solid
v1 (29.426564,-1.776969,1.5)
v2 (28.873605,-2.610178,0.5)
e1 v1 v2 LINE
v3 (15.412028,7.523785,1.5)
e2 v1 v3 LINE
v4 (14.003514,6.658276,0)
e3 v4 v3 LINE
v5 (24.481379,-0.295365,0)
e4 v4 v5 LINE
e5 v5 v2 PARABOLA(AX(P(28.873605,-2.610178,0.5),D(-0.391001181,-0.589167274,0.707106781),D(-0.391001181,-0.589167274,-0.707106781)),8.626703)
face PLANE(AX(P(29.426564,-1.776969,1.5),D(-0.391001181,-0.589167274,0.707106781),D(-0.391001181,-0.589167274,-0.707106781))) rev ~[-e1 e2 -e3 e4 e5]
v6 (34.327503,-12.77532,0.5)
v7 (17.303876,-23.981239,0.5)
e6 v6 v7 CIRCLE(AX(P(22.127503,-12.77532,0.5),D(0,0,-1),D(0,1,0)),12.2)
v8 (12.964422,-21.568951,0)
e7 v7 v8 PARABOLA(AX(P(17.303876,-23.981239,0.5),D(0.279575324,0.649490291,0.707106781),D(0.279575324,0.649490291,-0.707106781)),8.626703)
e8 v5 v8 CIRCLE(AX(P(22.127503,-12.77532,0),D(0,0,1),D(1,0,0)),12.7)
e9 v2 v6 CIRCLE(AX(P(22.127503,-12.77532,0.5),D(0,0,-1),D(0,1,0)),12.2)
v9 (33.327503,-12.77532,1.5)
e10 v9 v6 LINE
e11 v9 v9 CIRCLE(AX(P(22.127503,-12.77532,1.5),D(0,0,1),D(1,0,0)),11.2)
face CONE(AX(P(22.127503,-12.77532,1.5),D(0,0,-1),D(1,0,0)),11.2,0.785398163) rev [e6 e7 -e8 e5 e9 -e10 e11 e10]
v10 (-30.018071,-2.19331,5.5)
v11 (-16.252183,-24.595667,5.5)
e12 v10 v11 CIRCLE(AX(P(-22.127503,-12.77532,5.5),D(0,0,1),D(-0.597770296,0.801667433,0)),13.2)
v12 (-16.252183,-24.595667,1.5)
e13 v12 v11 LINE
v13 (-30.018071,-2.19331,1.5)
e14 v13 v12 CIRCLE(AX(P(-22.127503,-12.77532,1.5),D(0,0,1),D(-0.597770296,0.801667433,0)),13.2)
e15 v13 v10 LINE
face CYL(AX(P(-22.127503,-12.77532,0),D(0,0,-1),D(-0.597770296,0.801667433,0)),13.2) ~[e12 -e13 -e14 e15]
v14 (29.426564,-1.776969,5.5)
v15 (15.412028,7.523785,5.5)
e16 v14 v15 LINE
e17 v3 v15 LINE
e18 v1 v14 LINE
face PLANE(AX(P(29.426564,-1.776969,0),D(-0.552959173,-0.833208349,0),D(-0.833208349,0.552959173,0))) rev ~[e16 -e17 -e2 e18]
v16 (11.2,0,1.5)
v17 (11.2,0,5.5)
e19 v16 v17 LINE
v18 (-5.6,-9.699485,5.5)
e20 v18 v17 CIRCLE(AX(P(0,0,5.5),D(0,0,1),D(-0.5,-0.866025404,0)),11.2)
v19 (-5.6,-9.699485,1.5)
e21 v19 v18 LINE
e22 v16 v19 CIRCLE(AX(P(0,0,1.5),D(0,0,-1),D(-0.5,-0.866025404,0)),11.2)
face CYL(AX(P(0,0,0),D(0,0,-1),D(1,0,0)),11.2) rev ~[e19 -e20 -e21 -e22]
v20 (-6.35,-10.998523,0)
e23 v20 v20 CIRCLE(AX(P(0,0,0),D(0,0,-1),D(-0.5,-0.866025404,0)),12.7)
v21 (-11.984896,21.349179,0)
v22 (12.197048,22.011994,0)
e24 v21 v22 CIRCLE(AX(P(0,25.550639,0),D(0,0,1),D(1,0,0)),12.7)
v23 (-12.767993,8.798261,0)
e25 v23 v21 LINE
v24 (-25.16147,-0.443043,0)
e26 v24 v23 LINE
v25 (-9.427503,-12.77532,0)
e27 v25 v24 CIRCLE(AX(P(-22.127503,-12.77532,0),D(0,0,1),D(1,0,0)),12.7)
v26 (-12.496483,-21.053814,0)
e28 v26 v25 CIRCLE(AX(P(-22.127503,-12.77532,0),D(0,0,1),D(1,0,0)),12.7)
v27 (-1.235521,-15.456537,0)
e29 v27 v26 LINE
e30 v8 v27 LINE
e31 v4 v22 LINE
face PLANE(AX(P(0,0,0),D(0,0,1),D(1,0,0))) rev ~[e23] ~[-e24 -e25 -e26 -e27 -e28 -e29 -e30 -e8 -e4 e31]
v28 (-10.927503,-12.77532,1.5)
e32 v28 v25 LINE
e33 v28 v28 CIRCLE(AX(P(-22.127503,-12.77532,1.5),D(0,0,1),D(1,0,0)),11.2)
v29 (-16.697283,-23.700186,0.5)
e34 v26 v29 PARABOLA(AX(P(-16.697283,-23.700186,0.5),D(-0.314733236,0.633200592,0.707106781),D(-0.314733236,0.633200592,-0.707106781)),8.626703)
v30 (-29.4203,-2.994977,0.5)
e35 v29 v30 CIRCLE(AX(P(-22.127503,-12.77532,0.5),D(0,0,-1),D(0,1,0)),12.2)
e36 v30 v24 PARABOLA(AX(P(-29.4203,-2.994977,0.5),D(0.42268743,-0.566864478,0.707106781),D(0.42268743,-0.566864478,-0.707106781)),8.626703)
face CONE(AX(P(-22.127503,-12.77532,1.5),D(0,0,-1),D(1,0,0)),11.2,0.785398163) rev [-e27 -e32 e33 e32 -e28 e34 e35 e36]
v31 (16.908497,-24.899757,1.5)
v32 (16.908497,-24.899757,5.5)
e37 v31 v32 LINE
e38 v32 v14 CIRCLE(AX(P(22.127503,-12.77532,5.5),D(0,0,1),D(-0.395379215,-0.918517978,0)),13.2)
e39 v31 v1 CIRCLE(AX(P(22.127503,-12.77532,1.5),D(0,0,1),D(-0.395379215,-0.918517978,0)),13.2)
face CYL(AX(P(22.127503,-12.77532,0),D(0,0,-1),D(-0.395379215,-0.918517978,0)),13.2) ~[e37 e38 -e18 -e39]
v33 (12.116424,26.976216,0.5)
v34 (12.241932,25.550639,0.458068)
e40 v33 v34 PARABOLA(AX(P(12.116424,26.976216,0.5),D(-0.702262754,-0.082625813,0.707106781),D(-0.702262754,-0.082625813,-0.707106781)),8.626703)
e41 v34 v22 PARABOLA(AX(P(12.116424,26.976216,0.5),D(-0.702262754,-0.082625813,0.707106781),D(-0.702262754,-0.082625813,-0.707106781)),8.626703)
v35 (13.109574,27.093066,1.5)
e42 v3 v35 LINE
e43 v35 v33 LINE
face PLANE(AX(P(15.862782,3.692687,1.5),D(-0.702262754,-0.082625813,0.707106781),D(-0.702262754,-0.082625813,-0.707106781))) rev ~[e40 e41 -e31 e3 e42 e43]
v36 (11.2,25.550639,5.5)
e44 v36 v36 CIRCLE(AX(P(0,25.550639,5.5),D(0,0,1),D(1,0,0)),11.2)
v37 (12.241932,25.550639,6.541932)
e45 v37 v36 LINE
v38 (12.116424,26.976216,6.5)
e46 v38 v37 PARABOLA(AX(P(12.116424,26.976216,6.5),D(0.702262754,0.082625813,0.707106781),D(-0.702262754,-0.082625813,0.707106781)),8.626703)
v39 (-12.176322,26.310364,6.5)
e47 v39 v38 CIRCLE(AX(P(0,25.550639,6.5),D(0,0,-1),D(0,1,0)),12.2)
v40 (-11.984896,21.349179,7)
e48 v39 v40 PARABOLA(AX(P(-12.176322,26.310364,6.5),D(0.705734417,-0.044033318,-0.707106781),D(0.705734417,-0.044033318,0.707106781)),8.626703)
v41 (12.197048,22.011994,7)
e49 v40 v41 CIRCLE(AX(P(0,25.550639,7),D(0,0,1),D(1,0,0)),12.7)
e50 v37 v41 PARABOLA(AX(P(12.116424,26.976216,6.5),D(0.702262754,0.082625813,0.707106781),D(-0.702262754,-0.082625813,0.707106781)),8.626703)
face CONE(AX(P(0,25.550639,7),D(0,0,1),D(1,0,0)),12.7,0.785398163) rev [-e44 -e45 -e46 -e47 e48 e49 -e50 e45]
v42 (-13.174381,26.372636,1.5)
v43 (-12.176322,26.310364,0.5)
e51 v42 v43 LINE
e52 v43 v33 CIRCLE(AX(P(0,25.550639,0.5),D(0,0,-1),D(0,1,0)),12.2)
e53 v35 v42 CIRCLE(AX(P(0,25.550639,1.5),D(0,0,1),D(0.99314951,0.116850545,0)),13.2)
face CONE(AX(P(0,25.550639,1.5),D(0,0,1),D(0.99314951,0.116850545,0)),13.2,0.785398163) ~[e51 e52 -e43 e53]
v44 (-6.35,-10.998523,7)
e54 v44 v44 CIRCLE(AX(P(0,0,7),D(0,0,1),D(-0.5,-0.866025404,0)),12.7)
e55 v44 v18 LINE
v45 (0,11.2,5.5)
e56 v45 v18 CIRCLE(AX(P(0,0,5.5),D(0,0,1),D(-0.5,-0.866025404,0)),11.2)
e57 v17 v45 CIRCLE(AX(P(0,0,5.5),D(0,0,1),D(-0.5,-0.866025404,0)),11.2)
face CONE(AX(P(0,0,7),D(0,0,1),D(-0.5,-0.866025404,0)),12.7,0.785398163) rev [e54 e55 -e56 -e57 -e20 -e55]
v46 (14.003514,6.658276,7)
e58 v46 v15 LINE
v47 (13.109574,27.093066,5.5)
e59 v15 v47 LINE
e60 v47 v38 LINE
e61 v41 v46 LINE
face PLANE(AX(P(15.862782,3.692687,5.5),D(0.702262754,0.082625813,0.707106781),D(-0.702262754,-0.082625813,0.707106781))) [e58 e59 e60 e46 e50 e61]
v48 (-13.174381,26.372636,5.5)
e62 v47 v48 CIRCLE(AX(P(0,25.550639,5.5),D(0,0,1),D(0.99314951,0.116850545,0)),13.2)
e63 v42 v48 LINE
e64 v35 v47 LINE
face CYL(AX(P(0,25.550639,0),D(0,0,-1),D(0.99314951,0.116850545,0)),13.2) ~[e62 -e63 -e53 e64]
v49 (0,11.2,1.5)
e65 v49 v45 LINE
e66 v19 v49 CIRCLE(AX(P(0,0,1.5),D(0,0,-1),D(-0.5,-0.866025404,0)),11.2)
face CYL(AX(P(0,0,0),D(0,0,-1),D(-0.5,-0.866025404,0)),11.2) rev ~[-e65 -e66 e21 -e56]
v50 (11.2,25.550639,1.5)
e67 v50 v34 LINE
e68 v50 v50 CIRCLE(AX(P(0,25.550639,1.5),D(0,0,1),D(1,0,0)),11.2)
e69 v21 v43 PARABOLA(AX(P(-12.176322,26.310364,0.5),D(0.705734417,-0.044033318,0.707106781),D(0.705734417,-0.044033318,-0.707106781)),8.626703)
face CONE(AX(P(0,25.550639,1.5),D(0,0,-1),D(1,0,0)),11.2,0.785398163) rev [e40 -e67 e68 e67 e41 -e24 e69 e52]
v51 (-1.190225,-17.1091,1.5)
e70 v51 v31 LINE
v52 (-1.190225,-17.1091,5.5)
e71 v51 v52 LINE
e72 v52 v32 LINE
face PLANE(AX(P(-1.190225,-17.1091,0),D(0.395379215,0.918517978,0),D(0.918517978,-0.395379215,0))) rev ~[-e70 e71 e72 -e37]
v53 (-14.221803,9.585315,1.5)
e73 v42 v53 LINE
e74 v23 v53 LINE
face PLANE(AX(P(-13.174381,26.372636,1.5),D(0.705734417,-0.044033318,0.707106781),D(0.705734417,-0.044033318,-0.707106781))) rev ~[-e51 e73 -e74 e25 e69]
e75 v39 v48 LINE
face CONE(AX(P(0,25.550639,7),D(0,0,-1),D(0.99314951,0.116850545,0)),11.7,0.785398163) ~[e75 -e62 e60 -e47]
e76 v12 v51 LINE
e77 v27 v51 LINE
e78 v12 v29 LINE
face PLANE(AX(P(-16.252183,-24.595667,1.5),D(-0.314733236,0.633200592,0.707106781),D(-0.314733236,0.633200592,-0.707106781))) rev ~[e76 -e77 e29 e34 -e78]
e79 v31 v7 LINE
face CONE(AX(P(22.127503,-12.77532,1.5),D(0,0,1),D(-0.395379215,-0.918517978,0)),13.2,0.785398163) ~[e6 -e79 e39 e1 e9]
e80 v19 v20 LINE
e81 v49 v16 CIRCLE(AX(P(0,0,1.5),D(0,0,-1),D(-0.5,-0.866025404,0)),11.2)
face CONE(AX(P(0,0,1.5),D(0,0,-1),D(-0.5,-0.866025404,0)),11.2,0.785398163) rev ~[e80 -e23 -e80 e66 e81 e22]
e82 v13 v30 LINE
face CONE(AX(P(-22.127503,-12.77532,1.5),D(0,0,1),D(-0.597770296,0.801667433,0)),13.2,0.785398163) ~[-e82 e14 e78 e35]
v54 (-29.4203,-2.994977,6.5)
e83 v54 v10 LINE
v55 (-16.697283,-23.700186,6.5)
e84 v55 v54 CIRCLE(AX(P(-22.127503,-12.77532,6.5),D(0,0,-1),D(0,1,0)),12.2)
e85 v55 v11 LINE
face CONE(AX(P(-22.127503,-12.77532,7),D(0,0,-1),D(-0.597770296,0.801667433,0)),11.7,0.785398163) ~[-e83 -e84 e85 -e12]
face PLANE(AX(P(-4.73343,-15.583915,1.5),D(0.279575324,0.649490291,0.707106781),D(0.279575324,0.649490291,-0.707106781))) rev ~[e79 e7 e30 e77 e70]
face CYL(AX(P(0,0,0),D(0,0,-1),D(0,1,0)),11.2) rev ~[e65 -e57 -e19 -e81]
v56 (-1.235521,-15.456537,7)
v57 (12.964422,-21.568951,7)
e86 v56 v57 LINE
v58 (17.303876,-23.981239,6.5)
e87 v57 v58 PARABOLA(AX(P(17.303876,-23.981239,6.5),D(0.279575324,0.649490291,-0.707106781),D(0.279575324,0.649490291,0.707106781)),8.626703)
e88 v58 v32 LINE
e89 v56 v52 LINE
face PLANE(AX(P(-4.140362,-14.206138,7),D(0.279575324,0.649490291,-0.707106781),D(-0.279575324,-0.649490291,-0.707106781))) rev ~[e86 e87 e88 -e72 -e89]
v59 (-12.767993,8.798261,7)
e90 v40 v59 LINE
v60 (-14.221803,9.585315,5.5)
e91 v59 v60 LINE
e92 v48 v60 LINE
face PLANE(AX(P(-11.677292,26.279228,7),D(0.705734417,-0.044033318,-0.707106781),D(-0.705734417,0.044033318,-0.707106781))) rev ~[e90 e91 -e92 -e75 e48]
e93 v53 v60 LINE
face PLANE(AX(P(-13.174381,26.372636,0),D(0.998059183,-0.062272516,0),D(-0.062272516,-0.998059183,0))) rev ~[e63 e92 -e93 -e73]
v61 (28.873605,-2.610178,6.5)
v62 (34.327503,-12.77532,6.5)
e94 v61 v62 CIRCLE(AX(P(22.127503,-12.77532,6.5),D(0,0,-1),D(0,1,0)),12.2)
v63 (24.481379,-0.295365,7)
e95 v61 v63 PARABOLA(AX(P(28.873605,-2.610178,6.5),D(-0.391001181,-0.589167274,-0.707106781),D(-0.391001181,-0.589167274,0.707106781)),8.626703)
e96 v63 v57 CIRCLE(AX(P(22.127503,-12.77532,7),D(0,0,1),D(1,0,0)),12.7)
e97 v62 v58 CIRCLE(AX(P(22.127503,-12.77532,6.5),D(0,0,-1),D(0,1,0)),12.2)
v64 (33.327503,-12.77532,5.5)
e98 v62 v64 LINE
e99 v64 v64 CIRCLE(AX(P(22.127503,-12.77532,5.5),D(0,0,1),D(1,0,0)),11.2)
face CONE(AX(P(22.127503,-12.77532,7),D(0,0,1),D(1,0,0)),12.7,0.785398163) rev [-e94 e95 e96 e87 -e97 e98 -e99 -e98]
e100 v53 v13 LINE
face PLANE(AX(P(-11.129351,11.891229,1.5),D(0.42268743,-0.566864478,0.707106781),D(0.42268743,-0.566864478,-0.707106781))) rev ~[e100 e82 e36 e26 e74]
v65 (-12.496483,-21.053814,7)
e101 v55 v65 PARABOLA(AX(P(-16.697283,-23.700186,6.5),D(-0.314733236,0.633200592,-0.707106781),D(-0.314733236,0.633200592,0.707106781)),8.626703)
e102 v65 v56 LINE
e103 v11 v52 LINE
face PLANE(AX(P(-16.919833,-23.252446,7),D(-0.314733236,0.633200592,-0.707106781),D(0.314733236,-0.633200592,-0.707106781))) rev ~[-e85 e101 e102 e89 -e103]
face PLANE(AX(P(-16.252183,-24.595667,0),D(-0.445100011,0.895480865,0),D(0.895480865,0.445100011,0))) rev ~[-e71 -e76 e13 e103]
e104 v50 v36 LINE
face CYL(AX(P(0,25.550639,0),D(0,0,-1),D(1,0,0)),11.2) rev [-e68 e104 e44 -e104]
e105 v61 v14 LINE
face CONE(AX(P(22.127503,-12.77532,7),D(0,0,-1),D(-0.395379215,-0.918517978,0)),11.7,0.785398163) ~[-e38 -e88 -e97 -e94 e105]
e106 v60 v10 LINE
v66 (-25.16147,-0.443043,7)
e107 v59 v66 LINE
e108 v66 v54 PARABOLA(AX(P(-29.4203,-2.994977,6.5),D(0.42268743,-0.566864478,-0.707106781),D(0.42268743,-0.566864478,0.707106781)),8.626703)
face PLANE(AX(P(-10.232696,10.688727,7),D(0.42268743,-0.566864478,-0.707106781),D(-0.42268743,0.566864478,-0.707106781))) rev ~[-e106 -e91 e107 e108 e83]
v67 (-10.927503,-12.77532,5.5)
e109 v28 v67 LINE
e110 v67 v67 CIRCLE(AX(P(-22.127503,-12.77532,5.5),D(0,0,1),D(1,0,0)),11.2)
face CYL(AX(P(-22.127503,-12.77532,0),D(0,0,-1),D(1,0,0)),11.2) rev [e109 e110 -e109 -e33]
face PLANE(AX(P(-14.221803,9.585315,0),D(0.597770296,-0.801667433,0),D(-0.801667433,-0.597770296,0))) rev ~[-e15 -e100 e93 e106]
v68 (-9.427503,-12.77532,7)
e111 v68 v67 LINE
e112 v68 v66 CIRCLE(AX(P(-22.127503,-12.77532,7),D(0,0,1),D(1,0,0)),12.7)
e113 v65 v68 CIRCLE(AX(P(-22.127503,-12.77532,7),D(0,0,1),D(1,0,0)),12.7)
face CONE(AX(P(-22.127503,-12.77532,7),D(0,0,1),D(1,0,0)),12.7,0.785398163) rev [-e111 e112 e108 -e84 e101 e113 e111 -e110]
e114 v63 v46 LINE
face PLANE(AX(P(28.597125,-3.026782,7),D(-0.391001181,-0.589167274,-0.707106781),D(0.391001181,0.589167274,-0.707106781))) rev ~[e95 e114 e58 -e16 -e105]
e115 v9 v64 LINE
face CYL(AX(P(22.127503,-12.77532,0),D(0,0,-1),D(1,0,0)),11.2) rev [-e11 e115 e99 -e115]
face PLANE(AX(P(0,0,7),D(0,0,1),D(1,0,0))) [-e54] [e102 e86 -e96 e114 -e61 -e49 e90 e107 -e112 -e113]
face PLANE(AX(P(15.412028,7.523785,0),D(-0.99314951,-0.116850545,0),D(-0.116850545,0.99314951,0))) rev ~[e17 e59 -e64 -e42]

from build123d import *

# Parameters (mm, degrees)
F0_R         = 11.2
F1_DEPTH     = 7
F2_T4_DEPTH  = 23.5617897445
F2_T7_ANGLE  = 169.7193644143
F2_T11_DEPTH = 20.6774904565
F2_T16_DEPTH = 23.5617897445
F2_T19_ANGLE = 169.7193644143
F2_T23_DEPTH = 20.6774904565
F2_T28_DEPTH = 23.5617897445
F2_T31_ANGLE = 169.7193644143
F2_T35_DEPTH = 20.6774904565
F2_T49_DEPTH = 23.5617897445
F2_T53_DEPTH = 20.6774904565
F2_T60_DEPTH = 20.6774904565
F2_T64_DEPTH = 23.5617897445
F2_T71_DEPTH = 20.6774904565
F2_T75_DEPTH = 23.5617897445
F3_T4_DEPTH  = 23.5617897445
F3_T7_ANGLE  = 169.7193644143
F3_T11_DEPTH = 20.6774904565
F3_T16_DEPTH = 23.5617897445
F3_T19_ANGLE = 169.7193644143
F3_T23_DEPTH = 20.6774904565
F3_T28_DEPTH = 23.5617897445
F3_T31_ANGLE = 169.7193644143
F3_T35_DEPTH = 20.6774904565
F3_T49_DEPTH = 23.5617897445
F3_T53_DEPTH = 20.6774904565
F3_T60_DEPTH = 23.5617897445
F3_T64_DEPTH = 20.6774904565
F3_T71_DEPTH = 23.5617897445
F3_T75_DEPTH = 20.6774904565


# Not quite as in the source:
# - a fillet or chamfer that OpenCascade refuses, or shapes differently, is made with other operations: its cross-section is extruded or revolved along the edge and cut away or added


with BuildPart() as f1:
    # F0 (on Top) → F1 (new body)
    with BuildSketch(Plane.XY):
        with BuildLine():
            Line((15.4120276741, 7.5237850523), (13.109573538, 27.0930664517))
            ThreePointArc((13.109573538, 27.0930664517), (-0.3616695295, 38.7456835975), (-13.1743812219, 26.3726364702))
            Line((-13.1743812219, 26.3726364702), (-14.221802825, 9.5853149634))
            Line((-14.221802825, 9.5853149634), (-30.0180705826, -2.1933095092))
            ThreePointArc((-30.0180705826, -2.1933095092), (-33.3739115177, -19.686056799), (-16.252182537, -24.5956670524))
            Line((-16.252182537, -24.5956670524), (-1.1902248491, -17.1091000158))
            Line((-1.1902248491, -17.1091000158), (16.9084970446, -24.8997569426))
            ThreePointArc((16.9084970446, -24.8997569426), (33.7355810471, -19.0596267984), (29.4265637589, -1.7769694177))
            Line((29.4265637589, -1.7769694177), (15.4120276741, 7.5237850523))
        make_face()
        with Locations((-22.1275026794, -12.7753196284)):
            Circle(F0_R, mode=Mode.SUBTRACT)
        with Locations((22.1275026794, -12.7753196284)):
            Circle(F0_R, mode=Mode.SUBTRACT)
        with BuildLine():
            ThreePointArc((0, 11.2), (7.9195959493, 7.9195959493), (11.2, 0))
            ThreePointArc((11.2, 0), (5.6, -9.6994845224), (-5.6, -9.6994845224))
            ThreePointArc((-5.6, -9.6994845224), (-10.8183692544, 2.8987733051), (0, 11.2))
        make_face(mode=Mode.SUBTRACT)
        with Locations((0, 25.5506392568)):
            Circle(F0_R, mode=Mode.SUBTRACT)
    extrude(amount=F1_DEPTH)

    # F2: chamfer of 1.5 on 13 edges, made by hand


with BuildPart() as f2_tool2:
    # F2_s3 → F2_t4 (new body)
    with BuildSketch(Plane(origin=(-0.211945286, 1.8013896037, 0), x_dir=(0, 0, 1), z_dir=(-0.1168505451, 0.9931495105, 0))):
        Polygon((5.5, 16.185606124), (7, 14.685606124), (7, 16.185606124), align=None)
    extrude(amount=F2_T4_DEPTH)

    split(bisect_by=Plane(origin=(8.1788758548, 12.3240701783, 0), x_dir=(0, 0, 1), z_dir=(0.5529591727, 0.8332083493, 0)), keep=Keep.TOP)


with BuildPart() as f1_1:
    add(f1.part)

    # F2_t1: cut F2_tool2
    add(f2_tool2.part, mode=Mode.SUBTRACT)

    # F2_s6 → F2_t7 (revolve, cut)
    with BuildSketch(Plane(origin=(-2.9651532605, 25.2017695539, 0), x_dir=(0, 0, 1), z_dir=(0.1168505451, -0.9931495105, 0))):
        Polygon((7, -14.685606124), (5.5, -16.185606124), (7, -16.185606124), align=None)
    revolve(axis=Axis((0, 25.5506392568, 7), (0, 0, 1)), revolution_arc=F2_T7_ANGLE, mode=Mode.SUBTRACT)


with BuildPart() as f2_tool9:
    # F2_s10 → F2_t11 (new body)
    with BuildSketch(Plane(origin=(1.5880145579, 25.4515572947, 0), x_dir=(0, 0, 1), z_dir=(-0.0622725162, -0.9980591835, 0))):
        Polygon((7, 13.2911025961), (5.5, 14.7911025961), (7, 14.7911025961), align=None)
    extrude(amount=F2_T11_DEPTH)

    split(bisect_by=Plane(origin=(-9.6752745589, 12.9754733174, 0), x_dir=(0, 0, 1), z_dir=(-0.5977702957, 0.8016674333, 0)), keep=Keep.TOP)


with BuildPart() as f1_2:
    add(f1_1.part)

    # F2_t8: cut F2_tool9
    add(f2_tool9.part, mode=Mode.SUBTRACT)


with BuildPart() as f2_tool14:
    # F2_s15 → F2_t16 (new body)
    with BuildSketch(Plane(origin=(-1.4540765159, -1.0842448037, 0), x_dir=(0, 0, 1), z_dir=(-0.8016674333, -0.5977702957, 0))):
        Polygon((7, 14.685606124), (5.5, 16.185606124), (7, 16.185606124), align=None)
    extrude(amount=F2_T16_DEPTH)

    split(bisect_by=Plane(origin=(-14.7623957799, 0.9210791755, 0), x_dir=(0, 0, 1), z_dir=(-0.9980591835, 0.0622725162, 0)), keep=Keep.TOP)


with BuildPart() as f1_3:
    add(f1_2.part)

    # F2_t13: cut F2_tool14
    add(f2_tool14.part, mode=Mode.SUBTRACT)

    # F2_s18 → F2_t19 (revolve, cut)
    with BuildSketch(Plane(origin=(-20.3427960238, -15.1687828266, 0), x_dir=(0, 0, 1), z_dir=(0.8016674333, 0.5977702957, 0))):
        Polygon((7, -14.685606124), (5.5, -16.185606124), (7, -16.185606124), align=None)
    revolve(axis=Axis((-22.1275026794, -12.7753196284, 7), (0, 0, 1)), revolution_arc=F2_T19_ANGLE, mode=Mode.SUBTRACT)


with BuildPart() as f2_tool21:
    # F2_s22 → F2_t23 (new body)
    with BuildSketch(Plane(origin=(-22.835702462, -11.3505176986, 0), x_dir=(0, 0, 1), z_dir=(0.8954808655, 0.4451000108, 0))):
        Polygon((7, 13.2911025961), (5.5, 14.7911025961), (7, 14.7911025961), align=None)
    extrude(amount=F2_T23_DEPTH)

    split(bisect_by=Plane(origin=(-6.3994522396, -14.8667702153, 0), x_dir=(0, 0, 1), z_dir=(-0.3953792148, -0.9185179783, 0)), keep=Keep.TOP)


with BuildPart() as f1_4:
    add(f1_3.part)

    # F2_t20: cut F2_tool21
    add(f2_tool21.part, mode=Mode.SUBTRACT)


with BuildPart() as f2_tool26:
    # F2_s27 → F2_t28 (new body)
    with BuildSketch(Plane(origin=(1.6660218019, -0.7171447999, 0), x_dir=(0, 0, 1), z_dir=(0.9185179783, -0.3953792148, 0))):
        Polygon((7, 14.685606124), (5.5, 16.185606124), (7, 16.185606124), align=None)
    extrude(amount=F2_T28_DEPTH)

    split(bisect_by=Plane(origin=(6.5835199251, -13.2451493538, 0), x_dir=(0, 0, 1), z_dir=(0.4451000108, -0.8954808655, 0)), keep=Keep.TOP)


with BuildPart() as f1_5:
    add(f1_4.part)

    # F2_t25: cut F2_tool26
    add(f2_tool26.part, mode=Mode.SUBTRACT)

    # F2_s30 → F2_t31 (revolve, cut)
    with BuildSketch(Plane(origin=(23.3079492842, -10.0329867273, 0), x_dir=(0, 0, 1), z_dir=(-0.9185179783, 0.3953792148, 0))):
        Polygon((7, -14.685606124), (5.5, -16.185606124), (7, -16.185606124), align=None)
    revolve(axis=Axis((22.1275026794, -12.7753196284, 7), (0, 0, 1)), revolution_arc=F2_T31_ANGLE, mode=Mode.SUBTRACT)


with BuildPart() as f2_tool33:
    # F2_s34 → F2_t35 (new body)
    with BuildSketch(Plane(origin=(21.2476879041, -14.1010395961, 0), x_dir=(0, 0, 1), z_dir=(-0.8332083493, 0.5529591727, 0))):
        Polygon((7, 13.2911025961), (5.5, 14.7911025961), (7, 14.7911025961), align=None)
    extrude(amount=F2_T35_DEPTH)

    split(bisect_by=Plane(origin=(16.0747267985, 1.8912968978, 0), x_dir=(0, 0, 1), z_dir=(0.9931495105, 0.1168505451, 0)), keep=Keep.TOP)


with BuildPart() as f1_6:
    add(f1_5.part)

    # F2_t32: cut F2_tool33
    add(f2_tool33.part, mode=Mode.SUBTRACT)

    # F2_s37 → F2_t38 (revolve, cut)
    with BuildSketch(Plane.XZ.offset(12.7753196284)):
        Polygon((-9.4275026794, 7), (-10.9275026794, 5.5), (-10.9275026794, 7), align=None)
    revolve(axis=Axis((-22.1275026794, -12.7753196284, 7), (0, 0, 1)), mode=Mode.SUBTRACT)

    # F2_s39 → F2_t40 (revolve, cut)
    with BuildSketch(Plane.XZ.offset(12.7753196284)):
        Polygon((34.8275026794, 7), (33.3275026794, 5.5), (33.3275026794, 7), align=None)
    revolve(axis=Axis((22.1275026794, -12.7753196284, 7), (0, 0, 1)), mode=Mode.SUBTRACT)

    # F2_s41 → F2_t42 (revolve, cut)
    with BuildSketch(Plane(origin=(0, 0, 0), x_dir=(0, 0, 1), z_dir=(-0.8660254038, 0.5, 0))):
        Polygon((7, -12.7), (5.5, -11.2), (7, -11.2), align=None)
    revolve(axis=Axis((0, 0, 7), (0, 0, 1)), mode=Mode.SUBTRACT)

    # F2_s43 → F2_t44 (revolve, cut)
    with BuildSketch(Plane.XZ.offset(-25.5506392568)):
        Polygon((12.7, 7), (11.2, 5.5), (11.2, 7), align=None)
    revolve(axis=Axis((0, 25.5506392568, 7), (0, 0, 1)), mode=Mode.SUBTRACT)


with BuildPart() as f2_tool47:
    # F2_s48 → F2_t49 (new body)
    with BuildSketch(Plane(origin=(-0.211945286, 1.8013896037, 0), x_dir=(0, 0, 1), z_dir=(-0.1168505451, 0.9931495105, 0))):
        Polygon((5.5, 16.185606124), (7, 14.685606124), (7, 16.185606124), align=None)
    extrude(amount=F2_T49_DEPTH)

    split(bisect_by=Plane(origin=(8.1788758548, 12.3240701783, 0), x_dir=(0, 0, 1), z_dir=(-0.5529591727, -0.8332083493, 0)), keep=Keep.TOP)


with BuildPart() as f2_tool51:
    # F2_s52 → F2_t53 (new body)
    with BuildSketch(Plane(origin=(21.2476879041, -14.1010395961, 0), x_dir=(0, 0, 1), z_dir=(-0.8332083493, 0.5529591727, 0))):
        Polygon((7, 13.2911025961), (5.5, 14.7911025961), (7, 14.7911025961), align=None)
    extrude(amount=F2_T53_DEPTH)

    split(bisect_by=Plane(origin=(16.0747267985, 1.8912968978, 0), x_dir=(0, 0, 1), z_dir=(-0.9931495105, -0.1168505451, 0)), keep=Keep.TOP)


with BuildPart() as f2_tool47_1:
    add(f2_tool47.part)

    # F2_t55: intersect F2_tool51
    add(f2_tool51.part, mode=Mode.INTERSECT)


with BuildPart() as f1_7:
    add(f1_6.part)

    # F2_t45: cut F2_tool47
    add(f2_tool47_1.part, mode=Mode.SUBTRACT)


with BuildPart() as f2_tool58:
    # F2_s59 → F2_t60 (new body)
    with BuildSketch(Plane(origin=(1.5880145579, 25.4515572947, 0), x_dir=(0, 0, 1), z_dir=(-0.0622725162, -0.9980591835, 0))):
        Polygon((7, 13.2911025961), (5.5, 14.7911025961), (7, 14.7911025961), align=None)
    extrude(amount=F2_T60_DEPTH)

    split(bisect_by=Plane(origin=(-9.6752745589, 12.9754733174, 0), x_dir=(0, 0, 1), z_dir=(0.5977702957, -0.8016674333, 0)), keep=Keep.TOP)


with BuildPart() as f2_tool62:
    # F2_s63 → F2_t64 (new body)
    with BuildSketch(Plane(origin=(-1.4540765159, -1.0842448037, 0), x_dir=(0, 0, 1), z_dir=(-0.8016674333, -0.5977702957, 0))):
        Polygon((7, 14.685606124), (5.5, 16.185606124), (7, 16.185606124), align=None)
    extrude(amount=F2_T64_DEPTH)

    split(bisect_by=Plane(origin=(-14.7623957799, 0.9210791755, 0), x_dir=(0, 0, 1), z_dir=(0.9980591835, -0.0622725162, 0)), keep=Keep.TOP)


with BuildPart() as f2_tool58_1:
    add(f2_tool58.part)

    # F2_t66: intersect F2_tool62
    add(f2_tool62.part, mode=Mode.INTERSECT)


with BuildPart() as f1_8:
    add(f1_7.part)

    # F2_t56: cut F2_tool58
    add(f2_tool58_1.part, mode=Mode.SUBTRACT)


with BuildPart() as f2_tool69:
    # F2_s70 → F2_t71 (new body)
    with BuildSketch(Plane(origin=(-22.835702462, -11.3505176986, 0), x_dir=(0, 0, 1), z_dir=(0.8954808655, 0.4451000108, 0))):
        Polygon((7, 13.2911025961), (5.5, 14.7911025961), (7, 14.7911025961), align=None)
    extrude(amount=F2_T71_DEPTH)

    split(bisect_by=Plane(origin=(-6.3994522396, -14.8667702153, 0), x_dir=(0, 0, 1), z_dir=(0.3953792148, 0.9185179783, 0)), keep=Keep.TOP)


with BuildPart() as f2_tool73:
    # F2_s74 → F2_t75 (new body)
    with BuildSketch(Plane(origin=(1.6660218019, -0.7171447999, 0), x_dir=(0, 0, 1), z_dir=(0.9185179783, -0.3953792148, 0))):
        Polygon((7, 14.685606124), (5.5, 16.185606124), (7, 16.185606124), align=None)
    extrude(amount=F2_T75_DEPTH)

    split(bisect_by=Plane(origin=(6.5835199251, -13.2451493538, 0), x_dir=(0, 0, 1), z_dir=(-0.4451000108, 0.8954808655, 0)), keep=Keep.TOP)


with BuildPart() as f2_tool69_1:
    add(f2_tool69.part)

    # F2_t77: intersect F2_tool73
    add(f2_tool73.part, mode=Mode.INTERSECT)


with BuildPart() as f1_9:
    add(f1_8.part)

    # F2_t67: cut F2_tool69
    add(f2_tool69_1.part, mode=Mode.SUBTRACT)

    # F3: chamfer of 1.5 on 13 edges, made by hand


with BuildPart() as f3_tool2:
    # F3_s3 → F3_t4 (new body)
    with BuildSketch(Plane(origin=(-0.211945286, 1.8013896037, 0), x_dir=(0, 0, 1), z_dir=(-0.1168505451, 0.9931495105, 0))):
        Polygon((1.5, 16.185606124), (0, 14.685606124), (0, 16.185606124), align=None)
    extrude(amount=F3_T4_DEPTH)

    split(bisect_by=Plane(origin=(8.1788758548, 12.3240701783, 0), x_dir=(0, 0, 1), z_dir=(0.5529591727, 0.8332083493, 0)), keep=Keep.TOP)


with BuildPart() as f1_10:
    add(f1_9.part)

    # F3_t1: cut F3_tool2
    add(f3_tool2.part, mode=Mode.SUBTRACT)

    # F3_s6 → F3_t7 (revolve, cut)
    with BuildSketch(Plane(origin=(-2.9651532605, 25.2017695539, 0), x_dir=(0, 0, 1), z_dir=(0.1168505451, -0.9931495105, 0))):
        Polygon((1.5, -16.185606124), (0, -14.685606124), (0, -16.185606124), align=None)
    revolve(axis=Axis((0, 25.5506392568, 0), (0, 0, 1)), revolution_arc=F3_T7_ANGLE, mode=Mode.SUBTRACT)


with BuildPart() as f3_tool9:
    # F3_s10 → F3_t11 (new body)
    with BuildSketch(Plane(origin=(1.5880145579, 25.4515572947, 0), x_dir=(0, 0, 1), z_dir=(-0.0622725162, -0.9980591835, 0))):
        Polygon((1.5, 14.7911025961), (0, 13.2911025961), (0, 14.7911025961), align=None)
    extrude(amount=F3_T11_DEPTH)

    split(bisect_by=Plane(origin=(-9.6752745589, 12.9754733174, 0), x_dir=(0, 0, 1), z_dir=(-0.5977702957, 0.8016674333, 0)), keep=Keep.TOP)


with BuildPart() as f1_11:
    add(f1_10.part)

    # F3_t8: cut F3_tool9
    add(f3_tool9.part, mode=Mode.SUBTRACT)


with BuildPart() as f3_tool14:
    # F3_s15 → F3_t16 (new body)
    with BuildSketch(Plane(origin=(-1.4540765159, -1.0842448037, 0), x_dir=(0, 0, 1), z_dir=(-0.8016674333, -0.5977702957, 0))):
        Polygon((1.5, 16.185606124), (0, 14.685606124), (0, 16.185606124), align=None)
    extrude(amount=F3_T16_DEPTH)

    split(bisect_by=Plane(origin=(-14.7623957799, 0.9210791755, 0), x_dir=(0, 0, 1), z_dir=(-0.9980591835, 0.0622725162, 0)), keep=Keep.TOP)


with BuildPart() as f1_12:
    add(f1_11.part)

    # F3_t13: cut F3_tool14
    add(f3_tool14.part, mode=Mode.SUBTRACT)

    # F3_s18 → F3_t19 (revolve, cut)
    with BuildSketch(Plane(origin=(-20.3427960238, -15.1687828266, 0), x_dir=(0, 0, 1), z_dir=(0.8016674333, 0.5977702957, 0))):
        Polygon((1.5, -16.185606124), (0, -14.685606124), (0, -16.185606124), align=None)
    revolve(axis=Axis((-22.1275026794, -12.7753196284, 0), (0, 0, 1)), revolution_arc=F3_T19_ANGLE, mode=Mode.SUBTRACT)


with BuildPart() as f3_tool21:
    # F3_s22 → F3_t23 (new body)
    with BuildSketch(Plane(origin=(-22.835702462, -11.3505176986, 0), x_dir=(0, 0, 1), z_dir=(0.8954808655, 0.4451000108, 0))):
        Polygon((1.5, 14.7911025961), (0, 13.2911025961), (0, 14.7911025961), align=None)
    extrude(amount=F3_T23_DEPTH)

    split(bisect_by=Plane(origin=(-6.3994522396, -14.8667702153, 0), x_dir=(0, 0, 1), z_dir=(-0.3953792148, -0.9185179783, 0)), keep=Keep.TOP)


with BuildPart() as f1_13:
    add(f1_12.part)

    # F3_t20: cut F3_tool21
    add(f3_tool21.part, mode=Mode.SUBTRACT)


with BuildPart() as f3_tool26:
    # F3_s27 → F3_t28 (new body)
    with BuildSketch(Plane(origin=(1.6660218019, -0.7171447999, 0), x_dir=(0, 0, 1), z_dir=(0.9185179783, -0.3953792148, 0))):
        Polygon((1.5, 16.185606124), (0, 14.685606124), (0, 16.185606124), align=None)
    extrude(amount=F3_T28_DEPTH)

    split(bisect_by=Plane(origin=(6.5835199251, -13.2451493538, 0), x_dir=(0, 0, 1), z_dir=(0.4451000108, -0.8954808655, 0)), keep=Keep.TOP)


with BuildPart() as f1_14:
    add(f1_13.part)

    # F3_t25: cut F3_tool26
    add(f3_tool26.part, mode=Mode.SUBTRACT)

    # F3_s30 → F3_t31 (revolve, cut)
    with BuildSketch(Plane(origin=(23.3079492842, -10.0329867273, 0), x_dir=(0, 0, 1), z_dir=(-0.9185179783, 0.3953792148, 0))):
        Polygon((1.5, -16.185606124), (0, -14.685606124), (0, -16.185606124), align=None)
    revolve(axis=Axis((22.1275026794, -12.7753196284, 0), (0, 0, 1)), revolution_arc=F3_T31_ANGLE, mode=Mode.SUBTRACT)


with BuildPart() as f3_tool33:
    # F3_s34 → F3_t35 (new body)
    with BuildSketch(Plane(origin=(21.2476879041, -14.1010395961, 0), x_dir=(0, 0, 1), z_dir=(-0.8332083493, 0.5529591727, 0))):
        Polygon((1.5, 14.7911025961), (0, 13.2911025961), (0, 14.7911025961), align=None)
    extrude(amount=F3_T35_DEPTH)

    split(bisect_by=Plane(origin=(16.0747267985, 1.8912968978, 0), x_dir=(0, 0, 1), z_dir=(0.9931495105, 0.1168505451, 0)), keep=Keep.TOP)


with BuildPart() as f1_15:
    add(f1_14.part)

    # F3_t32: cut F3_tool33
    add(f3_tool33.part, mode=Mode.SUBTRACT)

    # F3_s37 → F3_t38 (revolve, cut)
    with BuildSketch(Plane.XZ.offset(12.7753196284)):
        Polygon((-10.9275026794, 1.5), (-9.4275026794, 0), (-10.9275026794, 0), align=None)
    revolve(axis=Axis((-22.1275026794, -12.7753196284, 0), (0, 0, 1)), mode=Mode.SUBTRACT)

    # F3_s39 → F3_t40 (revolve, cut)
    with BuildSketch(Plane.XZ.offset(12.7753196284)):
        Polygon((33.3275026794, 1.5), (34.8275026794, 0), (33.3275026794, 0), align=None)
    revolve(axis=Axis((22.1275026794, -12.7753196284, 0), (0, 0, 1)), mode=Mode.SUBTRACT)

    # F3_s41 → F3_t42 (revolve, cut)
    with BuildSketch(Plane(origin=(0, 0, 0), x_dir=(0, 0, 1), z_dir=(0.8660254038, -0.5, 0))):
        Polygon((1.5, 11.2), (0, 12.7), (0, 11.2), align=None)
    revolve(axis=Axis((0, 0, 0), (0, 0, -1)), mode=Mode.SUBTRACT)

    # F3_s43 → F3_t44 (revolve, cut)
    with BuildSketch(Plane.XZ.offset(-25.5506392568)):
        Polygon((11.2, 1.5), (12.7, 0), (11.2, 0), align=None)
    revolve(axis=Axis((0, 25.5506392568, 0), (0, 0, 1)), mode=Mode.SUBTRACT)


with BuildPart() as f3_tool47:
    # F3_s48 → F3_t49 (new body)
    with BuildSketch(Plane(origin=(-0.211945286, 1.8013896037, 0), x_dir=(0, 0, 1), z_dir=(-0.1168505451, 0.9931495105, 0))):
        Polygon((1.5, 16.185606124), (0, 14.685606124), (0, 16.185606124), align=None)
    extrude(amount=F3_T49_DEPTH)

    split(bisect_by=Plane(origin=(8.1788758548, 12.3240701783, 0), x_dir=(0, 0, 1), z_dir=(-0.5529591727, -0.8332083493, 0)), keep=Keep.TOP)


with BuildPart() as f3_tool51:
    # F3_s52 → F3_t53 (new body)
    with BuildSketch(Plane(origin=(21.2476879041, -14.1010395961, 0), x_dir=(0, 0, 1), z_dir=(-0.8332083493, 0.5529591727, 0))):
        Polygon((1.5, 14.7911025961), (0, 13.2911025961), (0, 14.7911025961), align=None)
    extrude(amount=F3_T53_DEPTH)

    split(bisect_by=Plane(origin=(16.0747267985, 1.8912968978, 0), x_dir=(0, 0, 1), z_dir=(-0.9931495105, -0.1168505451, 0)), keep=Keep.TOP)


with BuildPart() as f3_tool47_1:
    add(f3_tool47.part)

    # F3_t55: intersect F3_tool51
    add(f3_tool51.part, mode=Mode.INTERSECT)


with BuildPart() as f1_16:
    add(f1_15.part)

    # F3_t45: cut F3_tool47
    add(f3_tool47_1.part, mode=Mode.SUBTRACT)


with BuildPart() as f3_tool58:
    # F3_s59 → F3_t60 (new body)
    with BuildSketch(Plane(origin=(-1.4540765159, -1.0842448037, 0), x_dir=(0, 0, 1), z_dir=(-0.8016674333, -0.5977702957, 0))):
        Polygon((1.5, 16.185606124), (0, 14.685606124), (0, 16.185606124), align=None)
    extrude(amount=F3_T60_DEPTH)

    split(bisect_by=Plane(origin=(-14.7623957799, 0.9210791755, 0), x_dir=(0, 0, 1), z_dir=(0.9980591835, -0.0622725162, 0)), keep=Keep.TOP)


with BuildPart() as f3_tool62:
    # F3_s63 → F3_t64 (new body)
    with BuildSketch(Plane(origin=(1.5880145579, 25.4515572947, 0), x_dir=(0, 0, 1), z_dir=(-0.0622725162, -0.9980591835, 0))):
        Polygon((1.5, 14.7911025961), (0, 13.2911025961), (0, 14.7911025961), align=None)
    extrude(amount=F3_T64_DEPTH)

    split(bisect_by=Plane(origin=(-9.6752745589, 12.9754733174, 0), x_dir=(0, 0, 1), z_dir=(0.5977702957, -0.8016674333, 0)), keep=Keep.TOP)


with BuildPart() as f3_tool58_1:
    add(f3_tool58.part)

    # F3_t66: intersect F3_tool62
    add(f3_tool62.part, mode=Mode.INTERSECT)


with BuildPart() as f1_17:
    add(f1_16.part)

    # F3_t56: cut F3_tool58
    add(f3_tool58_1.part, mode=Mode.SUBTRACT)


with BuildPart() as f3_tool69:
    # F3_s70 → F3_t71 (new body)
    with BuildSketch(Plane(origin=(1.6660218019, -0.7171447999, 0), x_dir=(0, 0, 1), z_dir=(0.9185179783, -0.3953792148, 0))):
        Polygon((1.5, 16.185606124), (0, 14.685606124), (0, 16.185606124), align=None)
    extrude(amount=F3_T71_DEPTH)

    split(bisect_by=Plane(origin=(6.5835199251, -13.2451493538, 0), x_dir=(0, 0, 1), z_dir=(-0.4451000108, 0.8954808655, 0)), keep=Keep.TOP)


with BuildPart() as f3_tool73:
    # F3_s74 → F3_t75 (new body)
    with BuildSketch(Plane(origin=(-22.835702462, -11.3505176986, 0), x_dir=(0, 0, 1), z_dir=(0.8954808655, 0.4451000108, 0))):
        Polygon((1.5, 14.7911025961), (0, 13.2911025961), (0, 14.7911025961), align=None)
    extrude(amount=F3_T75_DEPTH)

    split(bisect_by=Plane(origin=(-6.3994522396, -14.8667702153, 0), x_dir=(0, 0, 1), z_dir=(0.3953792148, 0.9185179783, 0)), keep=Keep.TOP)


with BuildPart() as f3_tool69_1:
    add(f3_tool69.part)

    # F3_t77: intersect F3_tool73
    add(f3_tool73.part, mode=Mode.INTERSECT)


with BuildPart() as f1_18:
    add(f1_17.part)

    # F3_t67: cut F3_tool69
    add(f3_tool69_1.part, mode=Mode.SUBTRACT)


solid = f1_18.part
